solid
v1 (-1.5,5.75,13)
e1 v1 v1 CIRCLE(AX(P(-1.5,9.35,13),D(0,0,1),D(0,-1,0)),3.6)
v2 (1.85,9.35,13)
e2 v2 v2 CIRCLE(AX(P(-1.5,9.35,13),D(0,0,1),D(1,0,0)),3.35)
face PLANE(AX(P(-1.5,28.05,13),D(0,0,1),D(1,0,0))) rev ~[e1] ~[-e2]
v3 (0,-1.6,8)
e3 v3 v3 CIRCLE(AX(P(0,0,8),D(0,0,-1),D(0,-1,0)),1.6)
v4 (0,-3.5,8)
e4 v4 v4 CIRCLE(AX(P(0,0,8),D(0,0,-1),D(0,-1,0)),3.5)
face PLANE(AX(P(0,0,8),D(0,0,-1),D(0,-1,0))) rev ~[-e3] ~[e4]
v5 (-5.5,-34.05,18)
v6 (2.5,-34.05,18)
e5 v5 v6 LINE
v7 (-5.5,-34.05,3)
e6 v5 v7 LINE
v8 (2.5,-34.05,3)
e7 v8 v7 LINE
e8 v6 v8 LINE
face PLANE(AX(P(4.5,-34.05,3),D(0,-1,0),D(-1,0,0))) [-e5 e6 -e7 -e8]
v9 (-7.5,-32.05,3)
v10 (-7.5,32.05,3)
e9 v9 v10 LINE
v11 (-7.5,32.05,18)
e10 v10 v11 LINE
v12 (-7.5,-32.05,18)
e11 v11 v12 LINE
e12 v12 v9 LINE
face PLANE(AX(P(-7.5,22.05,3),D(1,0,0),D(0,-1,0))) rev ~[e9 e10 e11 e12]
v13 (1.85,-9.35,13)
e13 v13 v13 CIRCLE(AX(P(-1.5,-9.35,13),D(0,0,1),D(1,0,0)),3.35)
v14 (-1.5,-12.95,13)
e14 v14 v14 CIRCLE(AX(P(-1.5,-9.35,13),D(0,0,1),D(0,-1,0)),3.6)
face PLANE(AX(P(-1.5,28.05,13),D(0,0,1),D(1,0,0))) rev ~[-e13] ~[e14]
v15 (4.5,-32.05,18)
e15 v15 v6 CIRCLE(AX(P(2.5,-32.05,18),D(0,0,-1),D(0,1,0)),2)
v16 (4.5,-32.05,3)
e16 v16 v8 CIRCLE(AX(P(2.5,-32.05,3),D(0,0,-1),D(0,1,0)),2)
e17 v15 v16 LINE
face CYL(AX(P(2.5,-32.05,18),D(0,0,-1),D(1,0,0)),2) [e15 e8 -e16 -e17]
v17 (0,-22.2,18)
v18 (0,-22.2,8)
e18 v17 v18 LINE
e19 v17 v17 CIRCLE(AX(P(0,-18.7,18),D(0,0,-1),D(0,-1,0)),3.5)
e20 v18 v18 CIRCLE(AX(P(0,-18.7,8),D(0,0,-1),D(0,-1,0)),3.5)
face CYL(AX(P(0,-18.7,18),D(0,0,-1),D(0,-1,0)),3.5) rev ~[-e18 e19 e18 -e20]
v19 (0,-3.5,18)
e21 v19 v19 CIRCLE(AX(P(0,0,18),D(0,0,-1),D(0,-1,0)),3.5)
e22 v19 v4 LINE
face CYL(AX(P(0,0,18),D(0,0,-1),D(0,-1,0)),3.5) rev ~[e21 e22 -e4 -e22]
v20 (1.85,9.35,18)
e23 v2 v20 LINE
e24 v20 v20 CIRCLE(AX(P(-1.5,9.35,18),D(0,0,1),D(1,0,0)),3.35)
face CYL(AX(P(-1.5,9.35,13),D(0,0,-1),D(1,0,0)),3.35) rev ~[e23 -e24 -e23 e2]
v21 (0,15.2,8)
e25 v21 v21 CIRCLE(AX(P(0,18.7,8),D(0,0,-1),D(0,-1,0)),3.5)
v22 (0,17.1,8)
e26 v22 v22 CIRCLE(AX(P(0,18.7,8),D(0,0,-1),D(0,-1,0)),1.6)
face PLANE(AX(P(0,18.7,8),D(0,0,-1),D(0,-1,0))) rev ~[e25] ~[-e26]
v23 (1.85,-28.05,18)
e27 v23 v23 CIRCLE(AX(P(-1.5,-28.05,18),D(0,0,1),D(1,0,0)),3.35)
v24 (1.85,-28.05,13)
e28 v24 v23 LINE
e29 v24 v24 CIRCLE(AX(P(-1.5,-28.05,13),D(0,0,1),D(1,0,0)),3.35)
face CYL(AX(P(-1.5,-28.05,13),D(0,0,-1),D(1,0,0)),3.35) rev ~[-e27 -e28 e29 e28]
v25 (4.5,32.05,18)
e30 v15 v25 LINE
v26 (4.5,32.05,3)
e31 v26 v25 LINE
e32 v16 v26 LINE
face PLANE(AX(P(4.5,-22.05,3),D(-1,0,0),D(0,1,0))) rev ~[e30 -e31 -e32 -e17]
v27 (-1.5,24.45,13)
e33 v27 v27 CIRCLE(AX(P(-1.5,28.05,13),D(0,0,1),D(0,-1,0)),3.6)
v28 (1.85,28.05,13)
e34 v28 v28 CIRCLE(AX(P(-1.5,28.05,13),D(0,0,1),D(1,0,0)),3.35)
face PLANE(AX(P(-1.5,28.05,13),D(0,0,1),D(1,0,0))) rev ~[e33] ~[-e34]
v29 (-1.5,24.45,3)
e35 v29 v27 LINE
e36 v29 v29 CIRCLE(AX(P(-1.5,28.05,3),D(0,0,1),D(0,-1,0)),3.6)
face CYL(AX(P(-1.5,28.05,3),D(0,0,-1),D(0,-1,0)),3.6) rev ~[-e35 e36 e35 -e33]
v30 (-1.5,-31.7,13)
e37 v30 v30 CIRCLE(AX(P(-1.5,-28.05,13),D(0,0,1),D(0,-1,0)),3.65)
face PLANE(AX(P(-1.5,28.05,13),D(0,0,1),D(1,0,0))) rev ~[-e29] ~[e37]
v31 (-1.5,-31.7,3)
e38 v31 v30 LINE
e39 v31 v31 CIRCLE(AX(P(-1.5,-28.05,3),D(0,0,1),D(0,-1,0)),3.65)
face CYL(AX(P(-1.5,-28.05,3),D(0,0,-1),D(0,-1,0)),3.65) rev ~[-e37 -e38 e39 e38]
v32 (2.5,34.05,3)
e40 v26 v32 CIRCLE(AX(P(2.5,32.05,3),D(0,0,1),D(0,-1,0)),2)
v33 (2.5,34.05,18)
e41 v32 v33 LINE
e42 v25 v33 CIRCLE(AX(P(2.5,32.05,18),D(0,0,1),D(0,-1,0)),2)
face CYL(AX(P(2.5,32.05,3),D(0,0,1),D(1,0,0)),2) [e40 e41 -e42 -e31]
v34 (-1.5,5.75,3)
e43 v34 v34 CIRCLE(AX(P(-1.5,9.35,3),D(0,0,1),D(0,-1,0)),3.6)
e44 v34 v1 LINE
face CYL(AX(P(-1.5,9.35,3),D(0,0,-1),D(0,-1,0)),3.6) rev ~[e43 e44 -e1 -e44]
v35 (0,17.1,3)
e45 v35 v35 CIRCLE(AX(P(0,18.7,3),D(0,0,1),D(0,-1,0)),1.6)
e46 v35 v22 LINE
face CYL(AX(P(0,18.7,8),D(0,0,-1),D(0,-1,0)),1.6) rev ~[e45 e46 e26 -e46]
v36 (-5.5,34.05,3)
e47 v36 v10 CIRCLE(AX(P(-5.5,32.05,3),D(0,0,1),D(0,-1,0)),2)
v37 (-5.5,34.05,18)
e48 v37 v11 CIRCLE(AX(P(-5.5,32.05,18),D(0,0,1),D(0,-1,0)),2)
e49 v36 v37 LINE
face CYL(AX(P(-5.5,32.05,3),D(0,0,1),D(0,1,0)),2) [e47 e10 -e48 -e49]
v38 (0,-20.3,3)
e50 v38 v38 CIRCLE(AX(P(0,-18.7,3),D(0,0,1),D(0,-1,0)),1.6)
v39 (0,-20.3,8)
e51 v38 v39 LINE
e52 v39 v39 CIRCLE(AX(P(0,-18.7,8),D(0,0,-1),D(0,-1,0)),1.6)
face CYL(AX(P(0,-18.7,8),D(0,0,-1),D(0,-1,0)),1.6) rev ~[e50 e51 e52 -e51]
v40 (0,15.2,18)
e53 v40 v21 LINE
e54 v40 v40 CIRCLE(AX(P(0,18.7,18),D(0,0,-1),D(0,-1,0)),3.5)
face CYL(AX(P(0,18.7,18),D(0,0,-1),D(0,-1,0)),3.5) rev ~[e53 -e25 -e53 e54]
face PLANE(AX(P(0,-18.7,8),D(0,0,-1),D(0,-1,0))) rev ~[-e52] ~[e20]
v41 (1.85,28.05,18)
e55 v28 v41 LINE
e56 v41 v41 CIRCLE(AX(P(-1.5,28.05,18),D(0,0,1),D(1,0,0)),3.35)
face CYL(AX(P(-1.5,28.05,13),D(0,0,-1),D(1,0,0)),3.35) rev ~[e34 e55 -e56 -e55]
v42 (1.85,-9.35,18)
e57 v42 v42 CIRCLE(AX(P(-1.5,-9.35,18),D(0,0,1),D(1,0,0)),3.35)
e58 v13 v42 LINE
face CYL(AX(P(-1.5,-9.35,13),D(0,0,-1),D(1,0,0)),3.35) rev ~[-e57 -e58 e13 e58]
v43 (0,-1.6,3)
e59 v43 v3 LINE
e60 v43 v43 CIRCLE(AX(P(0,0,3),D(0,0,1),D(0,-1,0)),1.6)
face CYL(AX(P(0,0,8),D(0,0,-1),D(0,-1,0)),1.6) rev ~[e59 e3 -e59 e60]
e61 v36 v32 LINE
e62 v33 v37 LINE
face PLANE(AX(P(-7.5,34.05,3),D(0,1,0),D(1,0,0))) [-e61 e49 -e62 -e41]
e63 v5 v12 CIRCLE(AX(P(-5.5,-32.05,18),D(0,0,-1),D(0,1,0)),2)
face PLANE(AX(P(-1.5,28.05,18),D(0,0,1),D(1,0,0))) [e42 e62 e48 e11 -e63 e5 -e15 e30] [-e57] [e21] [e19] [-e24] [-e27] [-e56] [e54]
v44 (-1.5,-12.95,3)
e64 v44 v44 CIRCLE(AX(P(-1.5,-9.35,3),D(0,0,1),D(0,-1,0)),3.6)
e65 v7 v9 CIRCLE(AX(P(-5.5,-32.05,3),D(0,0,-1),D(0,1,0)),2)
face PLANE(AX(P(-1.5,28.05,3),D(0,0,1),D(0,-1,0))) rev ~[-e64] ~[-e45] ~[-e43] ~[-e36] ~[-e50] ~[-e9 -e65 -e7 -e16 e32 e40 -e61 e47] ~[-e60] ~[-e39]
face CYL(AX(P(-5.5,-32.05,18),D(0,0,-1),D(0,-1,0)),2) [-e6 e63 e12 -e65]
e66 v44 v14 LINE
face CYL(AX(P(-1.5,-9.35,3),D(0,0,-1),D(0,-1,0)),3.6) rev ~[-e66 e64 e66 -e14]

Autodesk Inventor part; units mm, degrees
ref_plane "YZ Plane" through (0, 0, 0) normal (1, 0, 0) x (0, 1, 0)
ref_plane "XZ Plane" through (0, 0, 0) normal (0, 1, 0) x (-1, 0, 0)
ref_plane "XY Plane" through (0, 0, 0) normal (0, 0, 1) x (1, 0, 0)
ref_plane "Arbeitsebene1" through (0, 0, 0) normal (0, 0, 1) x (1, 0, 0)
ref_plane "Arbeitsebene2" through (-1.5, 28.05, 3) normal (0, 0, 1) x (0, -1, 0)
sketch "Skizze2" plane through (-1.5, 28.05, 3) normal (0, 0, 1) x (0, -1, 0)
  circle A0 centre (56.1, 0) radius 4 construction
  circle A1 centre (56.1, 0) radius 3.65
  circle A2 centre (37.4, 0) radius 4 construction
  circle A3 centre (18.7, 0) radius 4 construction
  line L0 (6.2, -3) -> (-6.2, -3) construction
  circle A4 centre (0, 0) radius 4 construction
  circle A5 centre (37.4, 0) radius 3.6
  circle A6 centre (18.7, 0) radius 3.6
  circle A7 centre (0, 0) radius 3.6
  circle A8 centre (66, 1.5) radius 1.4 construction
  circle A9 centre (46.75, 1.5) radius 1.4 construction
  circle A10 centre (28.05, 1.5) radius 1.4 construction
  circle A11 centre (9.35, 1.5) radius 1.4 construction
  circle A12 centre (-9.9, 1.5) radius 1.4 construction
  circle A13 centre (66, 1.5) radius 1.6
  circle A14 centre (46.75, 1.5) radius 1.6
  circle A15 centre (28.05, 1.5) radius 1.6
  circle A16 centre (9.35, 1.5) radius 1.6
  circle A17 centre (-9.9, 1.5) radius 1.6
  line L1 (6, 6) -> (6, -6) projected
  line L2 (-6, 6) -> (6, 6) projected
  line L3 (-6, -6) -> (-6, 6) projected
  line L4 (6, -6) -> (-6, -6) projected
  circle A18 centre (0, 0) radius 4 projected
  line L5 (62.1, 6) -> (62.1, -6) projected
  line L6 (50.1, 6) -> (62.1, 6) projected
  line L7 (50.1, -6) -> (50.1, 6) projected
  line L8 (62.1, -6) -> (50.1, -6) projected
  circle A19 centre (56.1, 0) radius 4 projected
  line L9 (69.1, 6) -> (-12.4207, 6)
  line L10 (-12.4207, 6) -> (-12.4207, -6)
  line L11 (-12.4207, -6) -> (69.1, -6)
  line L12 (69.1, -6) -> (69.1, 6)
  point P0 (28.05, 1.5)
  point P1 (50.1, 6)
  point P2 (6, 6)
  point P3 (6, -6)
  dimension "d0" = 7.3
  dimension "d1" = 7.2
  dimension "d2" = 7.2
  dimension "d3" = 7.2
  dimension "d4" = 3.2
  dimension "d5" = 3.2
  dimension "d6" = 3.2
  dimension "d7" = 3.2
  dimension "d8" = 3.2
  dimension "d9" = 7
extrude "Extrusion1" add sketch "Skizze2" along normal blind 10 contours L9 L7 L11 L1 | L1 L4 L3 L2 | L6 L5 L8 L7 | A18 | A19
sketch "Skizze3" plane through (-1.5, 28.05, 13) normal (0, 0, 1) x (1, 0, 0)
  line L0 (-6, 6) -> (-6, -62.1) projected
  line L1 (-6, -62.1) -> (6, -62.1) projected
  line L2 (6, -62.1) -> (6, 6) projected
  line L3 (6, 6) -> (-6, 6) projected
  circle A0 centre (1.5, -9.35) radius 1.6 projected
  circle A1 centre (1.5, -28.05) radius 1.6 projected
  circle A2 centre (1.5, -46.75) radius 1.6 projected
  circle A3 centre (0, -18.7) radius 3.6 projected
  circle A4 centre (0, -37.4) radius 3.6 projected
  circle A5 centre (0, 0) radius 3.6 projected
  circle A6 centre (0, -56.1) radius 3.35
  circle A7 centre (0, -37.4) radius 3.6 projected
  circle A8 centre (0, -37.4) radius 3.35
  circle A9 centre (0, -18.7) radius 3.6 projected
  circle A10 centre (0, -18.7) radius 3.35
  circle A11 centre (0, 0) radius 3.35
  point P0 (1.5, -28.05)
  dimension "d12" = 6.7
  dimension "d13" = 6.7
  dimension "d14" = 6.7
  dimension "d15" = 6.7
extrude "Extrusion2" add sketch "Skizze3" along normal blind 5 contours L3 L2 L1 L0 | A3 | A4 | A5
sketch "Skizze4" plane through (-1.5, 28.05, 18) normal (0, 0, 1) x (1, 0, 0)
  circle A0 centre (1.5, -46.75) radius 1.6 projected
  circle A1 centre (1.5, -28.05) radius 1.6 projected
  circle A2 centre (1.5, -9.35) radius 1.6 projected
  point P0 (1.5, -28.05)
hole "Bohrung1" at (0, -18.7, 18) at (0, 0, 18) at (0, 18.7, 18) direction (0, 0, -1) diameter 3.2 end through all counterbore diameter 7 counterbore depth 10
fillet "Rundung1" radius 2 4 edges at (4.5, -34.05, 10.5) (-7.5, -34.05, 10.5) (-7.5, 34.05, 10.5) (4.5, 34.05, 10.5)
properties part number "Omniscope_USBC_Bar_lenses"
